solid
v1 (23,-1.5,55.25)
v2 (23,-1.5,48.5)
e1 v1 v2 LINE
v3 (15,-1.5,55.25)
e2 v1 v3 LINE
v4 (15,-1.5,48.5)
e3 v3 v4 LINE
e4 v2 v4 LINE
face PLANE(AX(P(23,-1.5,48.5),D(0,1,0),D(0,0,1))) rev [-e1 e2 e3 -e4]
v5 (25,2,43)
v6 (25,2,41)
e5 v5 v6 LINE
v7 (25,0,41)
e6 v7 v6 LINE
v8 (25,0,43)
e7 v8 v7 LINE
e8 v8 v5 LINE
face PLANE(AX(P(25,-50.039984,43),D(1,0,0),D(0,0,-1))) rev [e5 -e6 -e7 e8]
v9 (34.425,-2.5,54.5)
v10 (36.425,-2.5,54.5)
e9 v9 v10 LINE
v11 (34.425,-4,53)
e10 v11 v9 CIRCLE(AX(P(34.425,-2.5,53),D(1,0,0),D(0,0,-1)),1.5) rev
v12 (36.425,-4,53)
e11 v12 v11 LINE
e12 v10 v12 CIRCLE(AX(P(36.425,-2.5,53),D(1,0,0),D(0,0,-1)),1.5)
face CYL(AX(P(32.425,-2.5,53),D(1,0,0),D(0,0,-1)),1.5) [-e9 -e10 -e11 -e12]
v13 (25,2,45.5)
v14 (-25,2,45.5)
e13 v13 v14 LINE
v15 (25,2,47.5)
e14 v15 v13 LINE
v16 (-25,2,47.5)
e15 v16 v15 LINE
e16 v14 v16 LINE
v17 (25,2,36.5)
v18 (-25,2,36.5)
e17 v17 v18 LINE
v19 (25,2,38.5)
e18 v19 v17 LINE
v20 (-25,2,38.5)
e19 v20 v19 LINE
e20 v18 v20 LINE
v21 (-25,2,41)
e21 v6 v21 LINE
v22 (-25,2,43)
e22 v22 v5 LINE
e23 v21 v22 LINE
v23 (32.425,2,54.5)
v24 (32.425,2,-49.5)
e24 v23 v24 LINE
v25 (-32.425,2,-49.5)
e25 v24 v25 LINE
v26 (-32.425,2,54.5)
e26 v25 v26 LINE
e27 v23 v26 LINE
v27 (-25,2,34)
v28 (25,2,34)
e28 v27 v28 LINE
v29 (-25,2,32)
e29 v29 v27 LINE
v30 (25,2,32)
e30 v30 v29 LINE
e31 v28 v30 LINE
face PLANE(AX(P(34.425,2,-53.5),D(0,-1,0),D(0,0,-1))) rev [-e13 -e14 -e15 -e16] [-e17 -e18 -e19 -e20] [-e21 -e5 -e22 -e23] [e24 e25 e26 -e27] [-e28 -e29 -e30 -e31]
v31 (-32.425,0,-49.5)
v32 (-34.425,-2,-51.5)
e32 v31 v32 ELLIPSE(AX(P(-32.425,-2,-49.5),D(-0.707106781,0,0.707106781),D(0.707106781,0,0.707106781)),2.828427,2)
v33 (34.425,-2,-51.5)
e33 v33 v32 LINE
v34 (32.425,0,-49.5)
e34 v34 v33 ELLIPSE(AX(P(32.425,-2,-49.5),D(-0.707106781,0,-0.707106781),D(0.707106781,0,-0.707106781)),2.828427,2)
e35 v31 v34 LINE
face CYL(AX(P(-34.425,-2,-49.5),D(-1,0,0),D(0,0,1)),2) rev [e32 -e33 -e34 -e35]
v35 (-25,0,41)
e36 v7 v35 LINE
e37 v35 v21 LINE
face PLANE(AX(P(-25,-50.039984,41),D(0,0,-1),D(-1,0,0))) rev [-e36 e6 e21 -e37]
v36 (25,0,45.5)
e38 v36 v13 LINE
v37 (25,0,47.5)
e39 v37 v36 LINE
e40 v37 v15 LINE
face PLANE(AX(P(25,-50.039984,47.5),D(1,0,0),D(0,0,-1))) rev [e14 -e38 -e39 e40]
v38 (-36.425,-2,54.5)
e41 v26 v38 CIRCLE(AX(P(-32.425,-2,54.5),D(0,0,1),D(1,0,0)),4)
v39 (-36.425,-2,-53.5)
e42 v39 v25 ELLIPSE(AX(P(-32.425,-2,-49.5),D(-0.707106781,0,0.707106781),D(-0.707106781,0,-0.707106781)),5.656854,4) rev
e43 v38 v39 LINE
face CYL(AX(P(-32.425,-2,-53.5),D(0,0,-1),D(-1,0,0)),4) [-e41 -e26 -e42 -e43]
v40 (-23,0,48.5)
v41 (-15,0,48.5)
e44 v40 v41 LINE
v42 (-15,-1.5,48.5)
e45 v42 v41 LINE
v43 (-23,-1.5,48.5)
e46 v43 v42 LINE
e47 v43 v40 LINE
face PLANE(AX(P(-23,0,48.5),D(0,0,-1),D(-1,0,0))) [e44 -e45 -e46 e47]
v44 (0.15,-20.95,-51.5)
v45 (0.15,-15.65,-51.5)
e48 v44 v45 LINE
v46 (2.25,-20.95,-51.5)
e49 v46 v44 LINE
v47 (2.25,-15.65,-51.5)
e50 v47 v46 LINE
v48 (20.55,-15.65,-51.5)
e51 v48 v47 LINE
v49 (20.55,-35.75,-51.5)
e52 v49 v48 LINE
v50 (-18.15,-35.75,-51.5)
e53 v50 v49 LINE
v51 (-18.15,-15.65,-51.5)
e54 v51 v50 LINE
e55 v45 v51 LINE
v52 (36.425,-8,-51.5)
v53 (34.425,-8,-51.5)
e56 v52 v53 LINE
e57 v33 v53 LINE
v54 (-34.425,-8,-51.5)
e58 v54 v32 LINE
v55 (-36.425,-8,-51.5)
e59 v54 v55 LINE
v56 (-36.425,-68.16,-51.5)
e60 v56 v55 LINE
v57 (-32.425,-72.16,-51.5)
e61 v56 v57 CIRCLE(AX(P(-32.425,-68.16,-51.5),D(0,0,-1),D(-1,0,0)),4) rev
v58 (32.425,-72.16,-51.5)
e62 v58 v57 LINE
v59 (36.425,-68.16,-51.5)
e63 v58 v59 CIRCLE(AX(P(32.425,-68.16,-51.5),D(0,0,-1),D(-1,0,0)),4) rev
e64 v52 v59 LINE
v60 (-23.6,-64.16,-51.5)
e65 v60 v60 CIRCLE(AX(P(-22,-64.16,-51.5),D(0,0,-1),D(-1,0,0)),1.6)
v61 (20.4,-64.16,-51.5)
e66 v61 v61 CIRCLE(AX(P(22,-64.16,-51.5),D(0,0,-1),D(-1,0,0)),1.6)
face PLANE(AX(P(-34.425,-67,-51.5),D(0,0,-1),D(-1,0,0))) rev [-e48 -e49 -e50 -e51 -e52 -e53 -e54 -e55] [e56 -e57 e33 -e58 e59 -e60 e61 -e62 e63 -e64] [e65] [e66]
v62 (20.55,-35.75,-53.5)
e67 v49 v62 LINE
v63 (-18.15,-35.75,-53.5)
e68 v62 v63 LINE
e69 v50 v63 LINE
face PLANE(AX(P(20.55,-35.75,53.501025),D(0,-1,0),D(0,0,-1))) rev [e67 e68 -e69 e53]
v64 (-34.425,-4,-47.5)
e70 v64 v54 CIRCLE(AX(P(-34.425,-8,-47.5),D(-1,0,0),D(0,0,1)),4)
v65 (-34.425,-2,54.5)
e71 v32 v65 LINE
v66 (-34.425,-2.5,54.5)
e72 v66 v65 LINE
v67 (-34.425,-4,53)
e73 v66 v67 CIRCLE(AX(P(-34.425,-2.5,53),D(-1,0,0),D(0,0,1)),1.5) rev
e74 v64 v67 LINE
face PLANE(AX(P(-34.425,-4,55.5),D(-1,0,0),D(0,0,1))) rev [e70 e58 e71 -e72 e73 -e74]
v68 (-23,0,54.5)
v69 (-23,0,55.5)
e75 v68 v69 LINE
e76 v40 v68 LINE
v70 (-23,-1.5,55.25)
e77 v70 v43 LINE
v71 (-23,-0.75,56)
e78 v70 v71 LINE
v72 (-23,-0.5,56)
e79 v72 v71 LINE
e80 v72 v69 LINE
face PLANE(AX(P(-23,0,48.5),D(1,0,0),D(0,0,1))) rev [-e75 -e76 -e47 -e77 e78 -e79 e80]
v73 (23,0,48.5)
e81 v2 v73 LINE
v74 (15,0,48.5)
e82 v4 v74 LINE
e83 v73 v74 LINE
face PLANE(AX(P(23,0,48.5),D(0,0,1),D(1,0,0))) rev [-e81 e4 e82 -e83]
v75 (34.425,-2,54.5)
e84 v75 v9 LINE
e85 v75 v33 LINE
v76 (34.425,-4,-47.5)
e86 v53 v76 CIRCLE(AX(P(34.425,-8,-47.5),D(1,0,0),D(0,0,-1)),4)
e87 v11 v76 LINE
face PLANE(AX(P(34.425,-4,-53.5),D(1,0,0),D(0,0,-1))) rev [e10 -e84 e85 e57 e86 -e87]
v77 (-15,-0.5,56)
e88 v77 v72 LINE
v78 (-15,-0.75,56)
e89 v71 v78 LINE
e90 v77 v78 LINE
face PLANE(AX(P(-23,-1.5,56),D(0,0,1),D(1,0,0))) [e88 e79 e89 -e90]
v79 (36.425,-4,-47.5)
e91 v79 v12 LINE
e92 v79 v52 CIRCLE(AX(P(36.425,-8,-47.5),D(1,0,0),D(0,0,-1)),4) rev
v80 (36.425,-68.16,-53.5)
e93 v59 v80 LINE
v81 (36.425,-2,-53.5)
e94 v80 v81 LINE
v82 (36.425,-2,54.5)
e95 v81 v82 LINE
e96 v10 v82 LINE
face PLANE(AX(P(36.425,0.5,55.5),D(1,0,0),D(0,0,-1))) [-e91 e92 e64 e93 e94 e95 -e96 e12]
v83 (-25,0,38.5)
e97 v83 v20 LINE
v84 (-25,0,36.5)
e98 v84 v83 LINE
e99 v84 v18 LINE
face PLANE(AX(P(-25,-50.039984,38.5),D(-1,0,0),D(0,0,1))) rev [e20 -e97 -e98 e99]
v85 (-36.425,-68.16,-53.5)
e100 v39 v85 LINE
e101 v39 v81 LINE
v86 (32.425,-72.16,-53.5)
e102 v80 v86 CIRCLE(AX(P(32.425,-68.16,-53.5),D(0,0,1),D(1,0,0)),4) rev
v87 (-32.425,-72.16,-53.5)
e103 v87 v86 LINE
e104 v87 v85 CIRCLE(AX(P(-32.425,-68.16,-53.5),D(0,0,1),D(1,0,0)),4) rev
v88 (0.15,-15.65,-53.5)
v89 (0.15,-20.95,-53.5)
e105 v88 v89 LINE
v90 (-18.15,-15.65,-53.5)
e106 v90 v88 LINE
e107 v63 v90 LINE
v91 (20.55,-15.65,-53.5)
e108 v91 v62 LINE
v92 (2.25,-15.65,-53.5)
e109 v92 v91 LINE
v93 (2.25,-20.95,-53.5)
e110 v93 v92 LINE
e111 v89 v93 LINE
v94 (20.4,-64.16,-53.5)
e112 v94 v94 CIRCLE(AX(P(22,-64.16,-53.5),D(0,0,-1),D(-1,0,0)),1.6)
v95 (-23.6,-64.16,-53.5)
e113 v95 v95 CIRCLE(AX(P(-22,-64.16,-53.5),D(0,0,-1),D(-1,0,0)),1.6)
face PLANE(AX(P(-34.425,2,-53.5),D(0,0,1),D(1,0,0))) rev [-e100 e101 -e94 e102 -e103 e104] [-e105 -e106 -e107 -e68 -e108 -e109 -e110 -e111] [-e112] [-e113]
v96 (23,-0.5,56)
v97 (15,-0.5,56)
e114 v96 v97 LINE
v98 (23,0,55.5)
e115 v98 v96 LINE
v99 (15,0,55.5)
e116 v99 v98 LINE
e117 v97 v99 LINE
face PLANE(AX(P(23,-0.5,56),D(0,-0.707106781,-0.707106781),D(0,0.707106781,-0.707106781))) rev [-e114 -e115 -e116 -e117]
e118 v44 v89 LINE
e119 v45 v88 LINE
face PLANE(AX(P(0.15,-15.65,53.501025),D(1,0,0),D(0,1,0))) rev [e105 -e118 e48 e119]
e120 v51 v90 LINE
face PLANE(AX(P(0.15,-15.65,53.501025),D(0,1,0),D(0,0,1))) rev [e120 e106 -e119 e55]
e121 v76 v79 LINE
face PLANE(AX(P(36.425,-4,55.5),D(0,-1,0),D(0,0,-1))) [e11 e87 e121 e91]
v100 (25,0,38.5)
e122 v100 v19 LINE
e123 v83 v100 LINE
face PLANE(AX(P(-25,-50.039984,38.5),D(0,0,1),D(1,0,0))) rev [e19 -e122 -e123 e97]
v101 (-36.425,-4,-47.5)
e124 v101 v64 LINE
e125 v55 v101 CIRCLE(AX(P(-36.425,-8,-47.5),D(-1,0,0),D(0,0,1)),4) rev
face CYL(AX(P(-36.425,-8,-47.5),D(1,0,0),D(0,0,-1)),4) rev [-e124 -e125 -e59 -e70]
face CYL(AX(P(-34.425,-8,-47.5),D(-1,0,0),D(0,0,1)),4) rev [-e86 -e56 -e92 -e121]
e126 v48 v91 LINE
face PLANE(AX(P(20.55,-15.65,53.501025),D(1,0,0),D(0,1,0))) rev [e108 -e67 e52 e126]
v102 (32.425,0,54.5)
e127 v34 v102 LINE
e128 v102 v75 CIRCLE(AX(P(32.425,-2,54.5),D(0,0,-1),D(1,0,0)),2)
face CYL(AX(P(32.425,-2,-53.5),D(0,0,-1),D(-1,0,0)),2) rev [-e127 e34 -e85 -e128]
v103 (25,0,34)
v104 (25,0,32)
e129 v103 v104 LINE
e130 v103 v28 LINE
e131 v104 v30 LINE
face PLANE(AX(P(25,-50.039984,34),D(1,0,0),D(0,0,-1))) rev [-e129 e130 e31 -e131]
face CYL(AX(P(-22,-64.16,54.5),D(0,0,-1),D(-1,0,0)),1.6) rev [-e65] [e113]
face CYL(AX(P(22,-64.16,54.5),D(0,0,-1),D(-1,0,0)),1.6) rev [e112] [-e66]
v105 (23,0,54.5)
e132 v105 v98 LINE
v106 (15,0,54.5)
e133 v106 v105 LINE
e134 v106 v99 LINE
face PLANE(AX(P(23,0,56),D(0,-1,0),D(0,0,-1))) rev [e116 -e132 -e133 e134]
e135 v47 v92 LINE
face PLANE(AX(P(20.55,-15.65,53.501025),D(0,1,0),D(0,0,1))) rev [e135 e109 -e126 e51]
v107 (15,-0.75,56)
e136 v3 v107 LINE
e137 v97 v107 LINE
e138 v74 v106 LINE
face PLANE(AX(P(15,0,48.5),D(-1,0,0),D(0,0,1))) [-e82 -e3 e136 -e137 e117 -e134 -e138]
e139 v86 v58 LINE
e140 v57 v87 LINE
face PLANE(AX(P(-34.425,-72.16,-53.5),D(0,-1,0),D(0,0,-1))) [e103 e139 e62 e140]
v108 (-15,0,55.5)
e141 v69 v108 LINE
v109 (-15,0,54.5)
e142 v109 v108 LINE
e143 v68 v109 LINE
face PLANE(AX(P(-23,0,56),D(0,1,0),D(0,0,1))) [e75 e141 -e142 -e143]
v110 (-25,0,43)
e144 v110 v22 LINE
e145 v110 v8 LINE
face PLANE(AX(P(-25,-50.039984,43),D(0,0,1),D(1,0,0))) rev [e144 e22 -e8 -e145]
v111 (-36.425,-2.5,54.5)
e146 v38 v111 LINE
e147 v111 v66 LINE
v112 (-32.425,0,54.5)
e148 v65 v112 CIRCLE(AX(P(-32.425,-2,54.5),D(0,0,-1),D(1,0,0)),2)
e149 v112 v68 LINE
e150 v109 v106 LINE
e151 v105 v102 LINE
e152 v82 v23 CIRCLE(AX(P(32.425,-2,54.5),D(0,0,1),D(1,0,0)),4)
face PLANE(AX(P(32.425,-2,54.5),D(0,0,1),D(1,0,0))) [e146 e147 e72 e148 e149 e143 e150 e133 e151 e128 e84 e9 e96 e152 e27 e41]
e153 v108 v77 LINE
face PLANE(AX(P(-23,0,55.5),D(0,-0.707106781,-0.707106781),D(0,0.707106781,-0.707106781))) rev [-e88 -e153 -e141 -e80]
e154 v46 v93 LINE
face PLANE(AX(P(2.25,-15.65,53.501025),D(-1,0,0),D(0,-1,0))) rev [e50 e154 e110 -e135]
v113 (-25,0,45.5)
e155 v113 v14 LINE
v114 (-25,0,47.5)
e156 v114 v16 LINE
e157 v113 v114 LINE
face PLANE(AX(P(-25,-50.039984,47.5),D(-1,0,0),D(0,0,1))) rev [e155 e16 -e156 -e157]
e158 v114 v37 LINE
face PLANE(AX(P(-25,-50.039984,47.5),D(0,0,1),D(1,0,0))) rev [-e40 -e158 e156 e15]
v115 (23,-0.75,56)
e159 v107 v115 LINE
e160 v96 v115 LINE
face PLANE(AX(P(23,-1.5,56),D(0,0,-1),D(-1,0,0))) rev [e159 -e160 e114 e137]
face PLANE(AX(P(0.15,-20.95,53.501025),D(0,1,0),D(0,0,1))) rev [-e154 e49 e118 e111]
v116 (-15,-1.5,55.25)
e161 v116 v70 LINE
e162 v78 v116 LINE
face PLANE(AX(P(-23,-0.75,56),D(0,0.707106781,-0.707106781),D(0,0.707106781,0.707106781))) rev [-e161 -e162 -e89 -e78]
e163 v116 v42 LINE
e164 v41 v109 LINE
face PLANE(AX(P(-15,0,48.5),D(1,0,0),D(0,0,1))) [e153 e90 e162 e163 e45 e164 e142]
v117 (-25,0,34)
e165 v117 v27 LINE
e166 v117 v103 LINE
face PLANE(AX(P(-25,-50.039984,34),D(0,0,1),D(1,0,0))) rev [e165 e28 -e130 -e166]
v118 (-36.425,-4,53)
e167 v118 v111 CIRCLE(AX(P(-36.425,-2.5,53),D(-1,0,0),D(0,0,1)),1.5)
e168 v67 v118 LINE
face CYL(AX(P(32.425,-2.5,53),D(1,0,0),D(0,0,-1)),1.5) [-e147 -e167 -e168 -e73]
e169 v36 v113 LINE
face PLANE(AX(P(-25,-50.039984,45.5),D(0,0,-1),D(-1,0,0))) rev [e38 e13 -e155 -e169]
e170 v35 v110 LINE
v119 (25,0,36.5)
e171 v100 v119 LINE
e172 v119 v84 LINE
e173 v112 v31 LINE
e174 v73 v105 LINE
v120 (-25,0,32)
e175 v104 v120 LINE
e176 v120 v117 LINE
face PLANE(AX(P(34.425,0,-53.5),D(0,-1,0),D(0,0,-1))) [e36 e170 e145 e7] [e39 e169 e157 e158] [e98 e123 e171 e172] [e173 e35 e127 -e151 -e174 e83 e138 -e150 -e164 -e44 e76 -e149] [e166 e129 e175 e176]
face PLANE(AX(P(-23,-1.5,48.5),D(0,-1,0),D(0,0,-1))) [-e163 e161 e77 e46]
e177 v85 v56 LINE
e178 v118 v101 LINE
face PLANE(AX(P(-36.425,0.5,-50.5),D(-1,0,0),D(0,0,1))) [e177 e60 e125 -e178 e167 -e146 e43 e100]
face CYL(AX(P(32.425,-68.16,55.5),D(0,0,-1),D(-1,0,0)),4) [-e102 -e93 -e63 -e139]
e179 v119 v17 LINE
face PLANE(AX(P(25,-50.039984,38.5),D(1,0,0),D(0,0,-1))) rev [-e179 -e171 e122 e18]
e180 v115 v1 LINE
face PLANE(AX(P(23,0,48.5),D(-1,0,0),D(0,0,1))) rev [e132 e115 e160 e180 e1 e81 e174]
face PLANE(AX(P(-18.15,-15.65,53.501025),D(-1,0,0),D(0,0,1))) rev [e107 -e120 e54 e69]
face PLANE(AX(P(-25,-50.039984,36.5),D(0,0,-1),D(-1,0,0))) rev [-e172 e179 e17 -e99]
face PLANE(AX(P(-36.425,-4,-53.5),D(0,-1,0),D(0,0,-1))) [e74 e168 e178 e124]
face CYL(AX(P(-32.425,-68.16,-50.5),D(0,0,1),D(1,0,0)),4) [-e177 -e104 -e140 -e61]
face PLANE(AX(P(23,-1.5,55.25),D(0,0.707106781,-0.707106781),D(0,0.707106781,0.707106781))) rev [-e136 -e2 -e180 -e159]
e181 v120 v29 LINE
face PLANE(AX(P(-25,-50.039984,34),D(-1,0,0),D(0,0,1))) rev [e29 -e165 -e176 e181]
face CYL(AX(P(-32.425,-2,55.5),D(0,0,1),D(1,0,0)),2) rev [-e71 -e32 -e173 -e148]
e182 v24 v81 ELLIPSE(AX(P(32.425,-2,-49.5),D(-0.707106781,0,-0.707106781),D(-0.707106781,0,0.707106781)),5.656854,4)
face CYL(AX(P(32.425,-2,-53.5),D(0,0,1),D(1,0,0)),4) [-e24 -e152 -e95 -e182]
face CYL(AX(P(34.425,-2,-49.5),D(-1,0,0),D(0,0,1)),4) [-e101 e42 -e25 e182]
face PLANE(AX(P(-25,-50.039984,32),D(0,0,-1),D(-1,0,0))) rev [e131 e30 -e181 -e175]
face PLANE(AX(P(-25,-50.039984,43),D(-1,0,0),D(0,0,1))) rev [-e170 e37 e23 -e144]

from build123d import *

# Parameters (mm, degrees)
SKETCH1_W                = 68.85
SKETCH1_H                = 107
BOSS_EXTRUDE1_DEPTH      = 2
SKETCH2_W                = 68.85
SKETCH2_H                = 2
BOSS_EXTRUDE2_DEPTH      = 67
CUT_EXTRUDE2_REACH       = 132.855
SKETCH5_W                = 68.85
SKETCH5_H                = 2
BOSS_EXTRUDE3_DEPTH      = 51
SKETCH6_W                = 68.85
SKETCH6_H                = 2
BOSS_EXTRUDE4_DEPTH      = 20.36
BOSS_EXTRUDE5_DEPTH      = 1.5
SKETCH13_W               = 2
SKETCH13_H               = 1.5
BOSS_EXTRUDE8_DEPTH      = 3
CUT_EXTRUDE4_REACH       = 97.75
SKETCH9_R                = 1.75
FILLET1_R                = 1.5
FILLET2_R                = 3
FILLET3_R                = 1.5
FILLET4_R                = 3
CUT_EXTRUDE5_REACH       = 111.975
SKETCH10_R               = 1.75
CHAMFER1_SIZE            = 2
SKETCH11_W               = 2
SKETCH11_H               = 109
BOSS_EXTRUDE6_DEPTH      = 4.5
SKETCH14_W               = 68.85
SKETCH14_H               = 0.5
BOSS_EXTRUDE9_DEPTH      = 2
FILLET5_R                = 2
FILLET6_R                = 4
FILLET8_R                = 4
CUT_EXTRUDE6_DEPTH       = 1
CUT_EXTRUDE7_DEPTH       = 125.986967721
SKETCH17_W               = 68.85
SKETCH17_H               = 2
BOSS_EXTRUDE10_DEPTH     = 8.66
SKETCH18_W               = 2
SKETCH18_H               = 68.16
BOSS_EXTRUDE11_DEPTH     = 2
SKETCH19_W               = 2
SKETCH19_H               = 68.16
BOSS_EXTRUDE12_DEPTH     = 2
FILLET9_R                = 4
FILLET10_R               = 4
FILLET11_R               = 1.5
BOSS_EXTRUDE13_START     = -2
BOSS_EXTRUDE13_OUTLINE_R = 1.6
BOSS_EXTRUDE13_DEPTH     = 2
BOSS_EXTRUDE14_START     = 19
SKETCH21_W               = 7.5
SKETCH21_H               = 1.5
BOSS_EXTRUDE14_DEPTH     = 4
CHAMFER2_SIZE            = 0.5
CHAMFER3_SIZE            = 0.75
SKETCH22_W               = 50
SKETCH22_H               = 2
CUT_EXTRUDE8_DEPTH       = 2
LPATTERN1_COUNT          = 4
LPATTERN1_PITCH          = 4.5


# Read off the part's stored shape, not the designer's step: Boss-Extrude13
with BuildPart() as part:
    # Sketch1 → Boss-Extrude1 (new body)
    with BuildSketch(Plane(origin=(0, 0, 0), x_dir=(1, 0, 0), z_dir=(0, 1, 0))):
        Rectangle(SKETCH1_W, SKETCH1_H)
    extrude(amount=BOSS_EXTRUDE1_DEPTH)

    # Sketch2 → Boss-Extrude2 (add)
    with BuildSketch(Plane.XZ):
        with Locations((0, -52.5)):
            Rectangle(SKETCH2_W, SKETCH2_H)
    extrude(amount=BOSS_EXTRUDE2_DEPTH)

    # Sketch4 → Cut-Extrude2 (cut, up to next)
    with BuildSketch(Plane(origin=(0, 0, -53.5), x_dir=(-1, 0, 0), z_dir=(0, 0, -1)), mode=Mode.PRIVATE) as cut_extrude2_sk1:
        Polygon((-2.25, -15.65), (-2.25, -20.95), (-0.15, -20.95), (-0.15, -15.65), (18.15, -15.65), (18.15, -35.75), (-20.55, -35.75), (-20.55, -15.65), align=None)
    cut_extrude2_tool1 = extrude(cut_extrude2_sk1.sketch, amount=-CUT_EXTRUDE2_REACH, mode=Mode.PRIVATE) & part.part
    add(cut_extrude2_tool1.solids().sort_by_distance((1.2, -25.807418, -53.5))[0], mode=Mode.SUBTRACT)

    # Sketch5 → Boss-Extrude3 (add)
    with BuildSketch(Plane.XY.offset(-51.5)):
        with Locations((0, -66)):
            Rectangle(SKETCH5_W, SKETCH5_H)
    extrude(amount=BOSS_EXTRUDE3_DEPTH)

    # Sketch6 → Boss-Extrude4 (add)
    with BuildSketch(Plane.XZ.offset(67)):
        with Locations((0, -1.5)):
            Rectangle(SKETCH6_W, SKETCH6_H)
    extrude(amount=BOSS_EXTRUDE4_DEPTH)

    # Sketch8 → Boss-Extrude5 (add)
    with BuildSketch(Plane(origin=(0, 2, 0), x_dir=(1, 0, 0), z_dir=(0, 1, 0))):
        Polygon((-36.425, 50.5), (-34.425, 50.5), (-34.425, -53.5), (34.425, -53.5), (34.425, 50.5), (36.425, 50.5), (36.425, -55.5), (-36.425, -55.5), align=None)
    extrude(amount=-BOSS_EXTRUDE5_DEPTH)

    # Sketch13 → Boss-Extrude8 (add)
    with BuildSketch(Plane(origin=(0, 0, -50.5), x_dir=(-1, 0, 0), z_dir=(0, 0, -1))):
        with Locations((35.425, 1.25)):
            Rectangle(SKETCH13_W, SKETCH13_H)
        with Locations((-35.425, 1.25)):
            Rectangle(SKETCH13_W, SKETCH13_H)
    extrude(amount=BOSS_EXTRUDE8_DEPTH)

    # Sketch9 → Cut-Extrude4 (cut, up to next)
    with BuildSketch(Plane.XZ.offset(67), mode=Mode.PRIVATE) as cut_extrude4_sk1:
        with Locations(Location((-25, -23.48, 0), (0, 0, 270))):
            Circle(SKETCH9_R)
    cut_extrude4_tool1 = extrude(cut_extrude4_sk1.sketch, amount=-CUT_EXTRUDE4_REACH, mode=Mode.PRIVATE) & part.part
    # Sketch9 → Cut-Extrude4 (cut, up to next)
    with BuildSketch(Plane.XZ.offset(67), mode=Mode.PRIVATE) as cut_extrude4_sk2:
        with Locations(Location((25, -23.48, 0), (0, 0, 270))):
            Circle(SKETCH9_R)
    cut_extrude4_tool2 = extrude(cut_extrude4_sk2.sketch, amount=-CUT_EXTRUDE4_REACH, mode=Mode.PRIVATE) & part.part
    add(cut_extrude4_tool1.solids().sort_by_distance((-25, -67, -23.48))[0], mode=Mode.SUBTRACT)
    add(cut_extrude4_tool2.solids().sort_by_distance((25, -67, -23.48))[0], mode=Mode.SUBTRACT)

    # Fillet1
    fillet1_edges = [part.edges().sort_by_distance(p)[0] for p in [
        (0, -67, -2.5),
    ]]
    fillet(fillet1_edges, radius=FILLET1_R)

    # Fillet2
    fillet2_edges = [part.edges().sort_by_distance(p)[0] for p in [
        (0, -65, -0.5),
    ]]
    fillet(fillet2_edges, radius=FILLET2_R)

    # Fillet3
    fillet3_edges = [part.edges().sort_by_distance(p)[0] for p in [
        (0, -65, -51.5),
    ]]
    fillet(fillet3_edges, radius=FILLET3_R)

    # Fillet4
    fillet4_edges = [part.edges().sort_by_distance(p)[0] for p in [
        (0, -67, -53.5),
    ]]
    fillet(fillet4_edges, radius=FILLET4_R)

    # Sketch10 → Cut-Extrude5 (cut, up to next)
    with BuildSketch(Plane.XY.offset(-0.5), mode=Mode.PRIVATE) as cut_extrude5_sk1:
        with Locations((-24.425, -79.36)):
            Circle(SKETCH10_R)
    cut_extrude5_tool1 = extrude(cut_extrude5_sk1.sketch, amount=-CUT_EXTRUDE5_REACH, mode=Mode.PRIVATE) & part.part
    # Sketch10 → Cut-Extrude5 (cut, up to next)
    with BuildSketch(Plane.XY.offset(-0.5), mode=Mode.PRIVATE) as cut_extrude5_sk2:
        with Locations((24.425, -79.36)):
            Circle(SKETCH10_R)
    cut_extrude5_tool2 = extrude(cut_extrude5_sk2.sketch, amount=-CUT_EXTRUDE5_REACH, mode=Mode.PRIVATE) & part.part
    add(cut_extrude5_tool1.solids().sort_by_distance((-24.425, -79.36, -0.5))[0], mode=Mode.SUBTRACT)
    add(cut_extrude5_tool2.solids().sort_by_distance((24.425, -79.36, -0.5))[0], mode=Mode.SUBTRACT)

    # Chamfer1
    chamfer1_edges = [part.edges().sort_by_distance(p)[0] for p in [
        (-34.425, -87.36, -1.5),
        (34.425, -87.36, -1.5),
    ]]
    chamfer(chamfer1_edges, length=CHAMFER1_SIZE)

    # Sketch11 → Boss-Extrude6 (add)
    with BuildSketch(Plane.XZ.offset(-0.5)):
        with Locations((35.425, 1)):
            Rectangle(SKETCH11_W, SKETCH11_H)
        with Locations((-35.425, 1)):
            Rectangle(SKETCH11_W, SKETCH11_H)
    extrude(amount=BOSS_EXTRUDE6_DEPTH)

    # Sketch14 → Boss-Extrude9 (add)
    with BuildSketch(Plane.XY.offset(53.5)):
        with Locations((0, 0.25)):
            Rectangle(SKETCH14_W, SKETCH14_H)
    extrude(amount=BOSS_EXTRUDE9_DEPTH)

    # Fillet5
    fillet5_edges = [part.edges().sort_by_distance(p)[0] for p in [
        (0, 0, -51.5),
        (34.425, 0, 2),
        (-34.425, 0, 2),
    ]]
    fillet(fillet5_edges, radius=FILLET5_R)

    # Fillet6
    fillet6_edges = [part.edges().sort_by_distance(p)[0] for p in [
        (0, 2, -53.5),
    ]]
    fillet(fillet6_edges, radius=FILLET6_R)

    # Fillet8
    # the kernel refuses this fillet: 4 mm, written as the material it takes off along each edge
    with BuildSketch(Plane(origin=(-36.425, 2, 65.5), x_dir=(1, 0, 0), z_dir=(0, 0, -1))) as fillet8_piece_1:
        with BuildLine():
            CenterArc((FILLET8_R, FILLET8_R), FILLET8_R, 180, 90)
            Line((0, FILLET8_R), (0, 0))
            Line((0, 0), (FILLET8_R, 0))
        make_face()
    extrude(amount=125, mode=Mode.SUBTRACT)
    with BuildSketch(Plane(origin=(36.425, 2, -59.5), x_dir=(0, -1, 0), z_dir=(0, 0, 1))) as fillet8_piece_2:
        with BuildLine():
            CenterArc((FILLET8_R, -FILLET8_R), FILLET8_R, 90, 90)
            Line((0, -FILLET8_R), (0, 0))
            Line((0, 0), (FILLET8_R, 0))
        make_face()
    extrude(amount=125, mode=Mode.SUBTRACT)

    # Sketch15 → Cut-Extrude6 (cut)
    with BuildSketch(Plane.XY.offset(55.5)):
        with BuildLine():
            Line((-36.425, -2), (-36.425, -4))
            Line((-36.425, -4), (-34.425, -4))
            Line((-34.425, -4), (-34.425, -2))
            ThreePointArc((-34.425, -2), (-33.839213562, -0.585786438), (-32.425, 0))
            Line((-32.425, 0), (32.425, 0))
            ThreePointArc((32.425, 0), (33.839213562, -0.585786438), (34.425, -2))
            Line((34.425, -2), (34.425, -4))
            Line((34.425, -4), (36.425, -4))
            Line((36.425, -4), (36.425, -2))
            ThreePointArc((36.425, -2), (35.253427125, 0.828427125), (32.425, 2))
            Line((32.425, 2), (-32.425, 2))
            ThreePointArc((-32.425, 2), (-35.253427125, 0.828427125), (-36.425, -2))
        make_face()
    extrude(amount=-CUT_EXTRUDE6_DEPTH, mode=Mode.SUBTRACT)

    # Sketch16 → Cut-Extrude7 (cut, through all)
    with BuildSketch(Plane(origin=(34.425, 0, 0), x_dir=(0, 0, -1), z_dir=(1, 0, 0))):
        with BuildLine():
            Line((2.5, -87.36), (0.5, -87.36))
            Line((0.5, -87.36), (0.5, -68))
            ThreePointArc((0.5, -68), (1.378679656, -65.878679656), (3.5, -65))
            Line((3.5, -65), (50, -65))
            ThreePointArc((50, -65), (51.060660172, -64.560660172), (51.5, -63.5))
            Line((51.5, -63.5), (53.5, -63.5))
            Line((53.5, -63.5), (53.5, -64))
            ThreePointArc((53.5, -64), (52.621320344, -66.121320344), (50.5, -67))
            Line((50.5, -67), (4, -67))
            ThreePointArc((4, -67), (2.939339828, -67.439339828), (2.5, -68.5))
            Line((2.5, -68.5), (2.5, -87.36))
        make_face()
    extrude(amount=-CUT_EXTRUDE7_DEPTH, mode=Mode.SUBTRACT)

    # Sketch17 → Boss-Extrude10 (add)
    with BuildSketch(Plane.XZ.offset(63.5)):
        with Locations((0, -52.5)):
            Rectangle(SKETCH17_W, SKETCH17_H)
    extrude(amount=BOSS_EXTRUDE10_DEPTH)

    # Sketch18 → Boss-Extrude11 (add)
    with BuildSketch(Plane(origin=(34.425, 0, 0), x_dir=(0, 0, -1), z_dir=(1, 0, 0))):
        with Locations((52.5, -38.08)):
            Rectangle(SKETCH18_W, SKETCH18_H)
    extrude(amount=BOSS_EXTRUDE11_DEPTH)

    # Sketch19 → Boss-Extrude12 (add)
    with BuildSketch(Plane.ZY.offset(34.425)):
        with Locations((-52.5, -38.08)):
            Rectangle(SKETCH19_W, SKETCH19_H)
    extrude(amount=BOSS_EXTRUDE12_DEPTH)

    # Fillet9
    fillet9_edges = [part.edges().sort_by_distance(p)[0] for p in [
        (36.425, -72.16, -52.5),
        (-36.425, -72.16, -52.5),
    ]]
    fillet(fillet9_edges, radius=FILLET9_R)

    # Fillet10
    fillet10_edges = [part.edges().sort_by_distance(p)[0] for p in [
        (35.425, -4, -51.5),
        (-35.425, -4, -51.5),
    ]]
    fillet(fillet10_edges, radius=FILLET10_R)

    # Fillet11
    fillet11_edges = [part.edges().sort_by_distance(p)[0] for p in [
        (35.425, -4, 54.5),
        (-35.425, -4, 54.5),
    ]]
    fillet(fillet11_edges, radius=FILLET11_R)

    # Boss-Extrude13 outline → Boss-Extrude13 (cut)
    with BuildSketch(Plane(origin=(0, 0, -53.5), x_dir=(-1, 0, 0), z_dir=(0, 0, -1)).offset(BOSS_EXTRUDE13_START)):
        with Locations((22, -64.16)):
            Circle(BOSS_EXTRUDE13_OUTLINE_R)
        with Locations((-22, -64.16)):
            Circle(BOSS_EXTRUDE13_OUTLINE_R)
    extrude(amount=BOSS_EXTRUDE13_DEPTH, mode=Mode.SUBTRACT)

    # Sketch21 → Boss-Extrude14 (add, symmetric)
    with BuildSketch(Plane(origin=(0, 0, 0), x_dir=(0, 0, -1), z_dir=(1, 0, 0)).offset(BOSS_EXTRUDE14_START)):
        with Locations((-52.25, -0.75)):
            Rectangle(SKETCH21_W, SKETCH21_H)
    boss_extrude14 = extrude(amount=BOSS_EXTRUDE14_DEPTH, both=True)

    # Mirror1: Boss-Extrude14 across plane
    add(boss_extrude14.mirror(Plane(origin=(0, 0, 0), x_dir=(0, 0, 1), z_dir=(1, 0, 0))))

    # Chamfer2
    chamfer2_edges = [part.edges().sort_by_distance(p)[0] for p in [
        (19, 0, 56),
        (-19, 0, 56),
    ]]
    chamfer(chamfer2_edges, length=CHAMFER2_SIZE)

    # Chamfer3
    chamfer3_edges = [part.edges().sort_by_distance(p)[0] for p in [
        (19, -1.5, 56),
        (-19, -1.5, 56),
    ]]
    chamfer(chamfer3_edges, length=CHAMFER3_SIZE)

    # Sketch22 → Cut-Extrude8 (cut)
    with BuildSketch(Plane(origin=(0, 2, 0), x_dir=(1, 0, 0), z_dir=(0, 1, 0))):
        with Locations((0, -46.5)):
            Rectangle(SKETCH22_W, SKETCH22_H)
    cut_extrude8 = extrude(amount=-CUT_EXTRUDE8_DEPTH, mode=Mode.SUBTRACT)

    # LPattern1: Cut-Extrude8 ×4
    with Locations(*[(0, 0, -i * LPATTERN1_PITCH) for i in range(1, LPATTERN1_COUNT)]):
        add(cut_extrude8, mode=Mode.SUBTRACT)


solid = part.part
